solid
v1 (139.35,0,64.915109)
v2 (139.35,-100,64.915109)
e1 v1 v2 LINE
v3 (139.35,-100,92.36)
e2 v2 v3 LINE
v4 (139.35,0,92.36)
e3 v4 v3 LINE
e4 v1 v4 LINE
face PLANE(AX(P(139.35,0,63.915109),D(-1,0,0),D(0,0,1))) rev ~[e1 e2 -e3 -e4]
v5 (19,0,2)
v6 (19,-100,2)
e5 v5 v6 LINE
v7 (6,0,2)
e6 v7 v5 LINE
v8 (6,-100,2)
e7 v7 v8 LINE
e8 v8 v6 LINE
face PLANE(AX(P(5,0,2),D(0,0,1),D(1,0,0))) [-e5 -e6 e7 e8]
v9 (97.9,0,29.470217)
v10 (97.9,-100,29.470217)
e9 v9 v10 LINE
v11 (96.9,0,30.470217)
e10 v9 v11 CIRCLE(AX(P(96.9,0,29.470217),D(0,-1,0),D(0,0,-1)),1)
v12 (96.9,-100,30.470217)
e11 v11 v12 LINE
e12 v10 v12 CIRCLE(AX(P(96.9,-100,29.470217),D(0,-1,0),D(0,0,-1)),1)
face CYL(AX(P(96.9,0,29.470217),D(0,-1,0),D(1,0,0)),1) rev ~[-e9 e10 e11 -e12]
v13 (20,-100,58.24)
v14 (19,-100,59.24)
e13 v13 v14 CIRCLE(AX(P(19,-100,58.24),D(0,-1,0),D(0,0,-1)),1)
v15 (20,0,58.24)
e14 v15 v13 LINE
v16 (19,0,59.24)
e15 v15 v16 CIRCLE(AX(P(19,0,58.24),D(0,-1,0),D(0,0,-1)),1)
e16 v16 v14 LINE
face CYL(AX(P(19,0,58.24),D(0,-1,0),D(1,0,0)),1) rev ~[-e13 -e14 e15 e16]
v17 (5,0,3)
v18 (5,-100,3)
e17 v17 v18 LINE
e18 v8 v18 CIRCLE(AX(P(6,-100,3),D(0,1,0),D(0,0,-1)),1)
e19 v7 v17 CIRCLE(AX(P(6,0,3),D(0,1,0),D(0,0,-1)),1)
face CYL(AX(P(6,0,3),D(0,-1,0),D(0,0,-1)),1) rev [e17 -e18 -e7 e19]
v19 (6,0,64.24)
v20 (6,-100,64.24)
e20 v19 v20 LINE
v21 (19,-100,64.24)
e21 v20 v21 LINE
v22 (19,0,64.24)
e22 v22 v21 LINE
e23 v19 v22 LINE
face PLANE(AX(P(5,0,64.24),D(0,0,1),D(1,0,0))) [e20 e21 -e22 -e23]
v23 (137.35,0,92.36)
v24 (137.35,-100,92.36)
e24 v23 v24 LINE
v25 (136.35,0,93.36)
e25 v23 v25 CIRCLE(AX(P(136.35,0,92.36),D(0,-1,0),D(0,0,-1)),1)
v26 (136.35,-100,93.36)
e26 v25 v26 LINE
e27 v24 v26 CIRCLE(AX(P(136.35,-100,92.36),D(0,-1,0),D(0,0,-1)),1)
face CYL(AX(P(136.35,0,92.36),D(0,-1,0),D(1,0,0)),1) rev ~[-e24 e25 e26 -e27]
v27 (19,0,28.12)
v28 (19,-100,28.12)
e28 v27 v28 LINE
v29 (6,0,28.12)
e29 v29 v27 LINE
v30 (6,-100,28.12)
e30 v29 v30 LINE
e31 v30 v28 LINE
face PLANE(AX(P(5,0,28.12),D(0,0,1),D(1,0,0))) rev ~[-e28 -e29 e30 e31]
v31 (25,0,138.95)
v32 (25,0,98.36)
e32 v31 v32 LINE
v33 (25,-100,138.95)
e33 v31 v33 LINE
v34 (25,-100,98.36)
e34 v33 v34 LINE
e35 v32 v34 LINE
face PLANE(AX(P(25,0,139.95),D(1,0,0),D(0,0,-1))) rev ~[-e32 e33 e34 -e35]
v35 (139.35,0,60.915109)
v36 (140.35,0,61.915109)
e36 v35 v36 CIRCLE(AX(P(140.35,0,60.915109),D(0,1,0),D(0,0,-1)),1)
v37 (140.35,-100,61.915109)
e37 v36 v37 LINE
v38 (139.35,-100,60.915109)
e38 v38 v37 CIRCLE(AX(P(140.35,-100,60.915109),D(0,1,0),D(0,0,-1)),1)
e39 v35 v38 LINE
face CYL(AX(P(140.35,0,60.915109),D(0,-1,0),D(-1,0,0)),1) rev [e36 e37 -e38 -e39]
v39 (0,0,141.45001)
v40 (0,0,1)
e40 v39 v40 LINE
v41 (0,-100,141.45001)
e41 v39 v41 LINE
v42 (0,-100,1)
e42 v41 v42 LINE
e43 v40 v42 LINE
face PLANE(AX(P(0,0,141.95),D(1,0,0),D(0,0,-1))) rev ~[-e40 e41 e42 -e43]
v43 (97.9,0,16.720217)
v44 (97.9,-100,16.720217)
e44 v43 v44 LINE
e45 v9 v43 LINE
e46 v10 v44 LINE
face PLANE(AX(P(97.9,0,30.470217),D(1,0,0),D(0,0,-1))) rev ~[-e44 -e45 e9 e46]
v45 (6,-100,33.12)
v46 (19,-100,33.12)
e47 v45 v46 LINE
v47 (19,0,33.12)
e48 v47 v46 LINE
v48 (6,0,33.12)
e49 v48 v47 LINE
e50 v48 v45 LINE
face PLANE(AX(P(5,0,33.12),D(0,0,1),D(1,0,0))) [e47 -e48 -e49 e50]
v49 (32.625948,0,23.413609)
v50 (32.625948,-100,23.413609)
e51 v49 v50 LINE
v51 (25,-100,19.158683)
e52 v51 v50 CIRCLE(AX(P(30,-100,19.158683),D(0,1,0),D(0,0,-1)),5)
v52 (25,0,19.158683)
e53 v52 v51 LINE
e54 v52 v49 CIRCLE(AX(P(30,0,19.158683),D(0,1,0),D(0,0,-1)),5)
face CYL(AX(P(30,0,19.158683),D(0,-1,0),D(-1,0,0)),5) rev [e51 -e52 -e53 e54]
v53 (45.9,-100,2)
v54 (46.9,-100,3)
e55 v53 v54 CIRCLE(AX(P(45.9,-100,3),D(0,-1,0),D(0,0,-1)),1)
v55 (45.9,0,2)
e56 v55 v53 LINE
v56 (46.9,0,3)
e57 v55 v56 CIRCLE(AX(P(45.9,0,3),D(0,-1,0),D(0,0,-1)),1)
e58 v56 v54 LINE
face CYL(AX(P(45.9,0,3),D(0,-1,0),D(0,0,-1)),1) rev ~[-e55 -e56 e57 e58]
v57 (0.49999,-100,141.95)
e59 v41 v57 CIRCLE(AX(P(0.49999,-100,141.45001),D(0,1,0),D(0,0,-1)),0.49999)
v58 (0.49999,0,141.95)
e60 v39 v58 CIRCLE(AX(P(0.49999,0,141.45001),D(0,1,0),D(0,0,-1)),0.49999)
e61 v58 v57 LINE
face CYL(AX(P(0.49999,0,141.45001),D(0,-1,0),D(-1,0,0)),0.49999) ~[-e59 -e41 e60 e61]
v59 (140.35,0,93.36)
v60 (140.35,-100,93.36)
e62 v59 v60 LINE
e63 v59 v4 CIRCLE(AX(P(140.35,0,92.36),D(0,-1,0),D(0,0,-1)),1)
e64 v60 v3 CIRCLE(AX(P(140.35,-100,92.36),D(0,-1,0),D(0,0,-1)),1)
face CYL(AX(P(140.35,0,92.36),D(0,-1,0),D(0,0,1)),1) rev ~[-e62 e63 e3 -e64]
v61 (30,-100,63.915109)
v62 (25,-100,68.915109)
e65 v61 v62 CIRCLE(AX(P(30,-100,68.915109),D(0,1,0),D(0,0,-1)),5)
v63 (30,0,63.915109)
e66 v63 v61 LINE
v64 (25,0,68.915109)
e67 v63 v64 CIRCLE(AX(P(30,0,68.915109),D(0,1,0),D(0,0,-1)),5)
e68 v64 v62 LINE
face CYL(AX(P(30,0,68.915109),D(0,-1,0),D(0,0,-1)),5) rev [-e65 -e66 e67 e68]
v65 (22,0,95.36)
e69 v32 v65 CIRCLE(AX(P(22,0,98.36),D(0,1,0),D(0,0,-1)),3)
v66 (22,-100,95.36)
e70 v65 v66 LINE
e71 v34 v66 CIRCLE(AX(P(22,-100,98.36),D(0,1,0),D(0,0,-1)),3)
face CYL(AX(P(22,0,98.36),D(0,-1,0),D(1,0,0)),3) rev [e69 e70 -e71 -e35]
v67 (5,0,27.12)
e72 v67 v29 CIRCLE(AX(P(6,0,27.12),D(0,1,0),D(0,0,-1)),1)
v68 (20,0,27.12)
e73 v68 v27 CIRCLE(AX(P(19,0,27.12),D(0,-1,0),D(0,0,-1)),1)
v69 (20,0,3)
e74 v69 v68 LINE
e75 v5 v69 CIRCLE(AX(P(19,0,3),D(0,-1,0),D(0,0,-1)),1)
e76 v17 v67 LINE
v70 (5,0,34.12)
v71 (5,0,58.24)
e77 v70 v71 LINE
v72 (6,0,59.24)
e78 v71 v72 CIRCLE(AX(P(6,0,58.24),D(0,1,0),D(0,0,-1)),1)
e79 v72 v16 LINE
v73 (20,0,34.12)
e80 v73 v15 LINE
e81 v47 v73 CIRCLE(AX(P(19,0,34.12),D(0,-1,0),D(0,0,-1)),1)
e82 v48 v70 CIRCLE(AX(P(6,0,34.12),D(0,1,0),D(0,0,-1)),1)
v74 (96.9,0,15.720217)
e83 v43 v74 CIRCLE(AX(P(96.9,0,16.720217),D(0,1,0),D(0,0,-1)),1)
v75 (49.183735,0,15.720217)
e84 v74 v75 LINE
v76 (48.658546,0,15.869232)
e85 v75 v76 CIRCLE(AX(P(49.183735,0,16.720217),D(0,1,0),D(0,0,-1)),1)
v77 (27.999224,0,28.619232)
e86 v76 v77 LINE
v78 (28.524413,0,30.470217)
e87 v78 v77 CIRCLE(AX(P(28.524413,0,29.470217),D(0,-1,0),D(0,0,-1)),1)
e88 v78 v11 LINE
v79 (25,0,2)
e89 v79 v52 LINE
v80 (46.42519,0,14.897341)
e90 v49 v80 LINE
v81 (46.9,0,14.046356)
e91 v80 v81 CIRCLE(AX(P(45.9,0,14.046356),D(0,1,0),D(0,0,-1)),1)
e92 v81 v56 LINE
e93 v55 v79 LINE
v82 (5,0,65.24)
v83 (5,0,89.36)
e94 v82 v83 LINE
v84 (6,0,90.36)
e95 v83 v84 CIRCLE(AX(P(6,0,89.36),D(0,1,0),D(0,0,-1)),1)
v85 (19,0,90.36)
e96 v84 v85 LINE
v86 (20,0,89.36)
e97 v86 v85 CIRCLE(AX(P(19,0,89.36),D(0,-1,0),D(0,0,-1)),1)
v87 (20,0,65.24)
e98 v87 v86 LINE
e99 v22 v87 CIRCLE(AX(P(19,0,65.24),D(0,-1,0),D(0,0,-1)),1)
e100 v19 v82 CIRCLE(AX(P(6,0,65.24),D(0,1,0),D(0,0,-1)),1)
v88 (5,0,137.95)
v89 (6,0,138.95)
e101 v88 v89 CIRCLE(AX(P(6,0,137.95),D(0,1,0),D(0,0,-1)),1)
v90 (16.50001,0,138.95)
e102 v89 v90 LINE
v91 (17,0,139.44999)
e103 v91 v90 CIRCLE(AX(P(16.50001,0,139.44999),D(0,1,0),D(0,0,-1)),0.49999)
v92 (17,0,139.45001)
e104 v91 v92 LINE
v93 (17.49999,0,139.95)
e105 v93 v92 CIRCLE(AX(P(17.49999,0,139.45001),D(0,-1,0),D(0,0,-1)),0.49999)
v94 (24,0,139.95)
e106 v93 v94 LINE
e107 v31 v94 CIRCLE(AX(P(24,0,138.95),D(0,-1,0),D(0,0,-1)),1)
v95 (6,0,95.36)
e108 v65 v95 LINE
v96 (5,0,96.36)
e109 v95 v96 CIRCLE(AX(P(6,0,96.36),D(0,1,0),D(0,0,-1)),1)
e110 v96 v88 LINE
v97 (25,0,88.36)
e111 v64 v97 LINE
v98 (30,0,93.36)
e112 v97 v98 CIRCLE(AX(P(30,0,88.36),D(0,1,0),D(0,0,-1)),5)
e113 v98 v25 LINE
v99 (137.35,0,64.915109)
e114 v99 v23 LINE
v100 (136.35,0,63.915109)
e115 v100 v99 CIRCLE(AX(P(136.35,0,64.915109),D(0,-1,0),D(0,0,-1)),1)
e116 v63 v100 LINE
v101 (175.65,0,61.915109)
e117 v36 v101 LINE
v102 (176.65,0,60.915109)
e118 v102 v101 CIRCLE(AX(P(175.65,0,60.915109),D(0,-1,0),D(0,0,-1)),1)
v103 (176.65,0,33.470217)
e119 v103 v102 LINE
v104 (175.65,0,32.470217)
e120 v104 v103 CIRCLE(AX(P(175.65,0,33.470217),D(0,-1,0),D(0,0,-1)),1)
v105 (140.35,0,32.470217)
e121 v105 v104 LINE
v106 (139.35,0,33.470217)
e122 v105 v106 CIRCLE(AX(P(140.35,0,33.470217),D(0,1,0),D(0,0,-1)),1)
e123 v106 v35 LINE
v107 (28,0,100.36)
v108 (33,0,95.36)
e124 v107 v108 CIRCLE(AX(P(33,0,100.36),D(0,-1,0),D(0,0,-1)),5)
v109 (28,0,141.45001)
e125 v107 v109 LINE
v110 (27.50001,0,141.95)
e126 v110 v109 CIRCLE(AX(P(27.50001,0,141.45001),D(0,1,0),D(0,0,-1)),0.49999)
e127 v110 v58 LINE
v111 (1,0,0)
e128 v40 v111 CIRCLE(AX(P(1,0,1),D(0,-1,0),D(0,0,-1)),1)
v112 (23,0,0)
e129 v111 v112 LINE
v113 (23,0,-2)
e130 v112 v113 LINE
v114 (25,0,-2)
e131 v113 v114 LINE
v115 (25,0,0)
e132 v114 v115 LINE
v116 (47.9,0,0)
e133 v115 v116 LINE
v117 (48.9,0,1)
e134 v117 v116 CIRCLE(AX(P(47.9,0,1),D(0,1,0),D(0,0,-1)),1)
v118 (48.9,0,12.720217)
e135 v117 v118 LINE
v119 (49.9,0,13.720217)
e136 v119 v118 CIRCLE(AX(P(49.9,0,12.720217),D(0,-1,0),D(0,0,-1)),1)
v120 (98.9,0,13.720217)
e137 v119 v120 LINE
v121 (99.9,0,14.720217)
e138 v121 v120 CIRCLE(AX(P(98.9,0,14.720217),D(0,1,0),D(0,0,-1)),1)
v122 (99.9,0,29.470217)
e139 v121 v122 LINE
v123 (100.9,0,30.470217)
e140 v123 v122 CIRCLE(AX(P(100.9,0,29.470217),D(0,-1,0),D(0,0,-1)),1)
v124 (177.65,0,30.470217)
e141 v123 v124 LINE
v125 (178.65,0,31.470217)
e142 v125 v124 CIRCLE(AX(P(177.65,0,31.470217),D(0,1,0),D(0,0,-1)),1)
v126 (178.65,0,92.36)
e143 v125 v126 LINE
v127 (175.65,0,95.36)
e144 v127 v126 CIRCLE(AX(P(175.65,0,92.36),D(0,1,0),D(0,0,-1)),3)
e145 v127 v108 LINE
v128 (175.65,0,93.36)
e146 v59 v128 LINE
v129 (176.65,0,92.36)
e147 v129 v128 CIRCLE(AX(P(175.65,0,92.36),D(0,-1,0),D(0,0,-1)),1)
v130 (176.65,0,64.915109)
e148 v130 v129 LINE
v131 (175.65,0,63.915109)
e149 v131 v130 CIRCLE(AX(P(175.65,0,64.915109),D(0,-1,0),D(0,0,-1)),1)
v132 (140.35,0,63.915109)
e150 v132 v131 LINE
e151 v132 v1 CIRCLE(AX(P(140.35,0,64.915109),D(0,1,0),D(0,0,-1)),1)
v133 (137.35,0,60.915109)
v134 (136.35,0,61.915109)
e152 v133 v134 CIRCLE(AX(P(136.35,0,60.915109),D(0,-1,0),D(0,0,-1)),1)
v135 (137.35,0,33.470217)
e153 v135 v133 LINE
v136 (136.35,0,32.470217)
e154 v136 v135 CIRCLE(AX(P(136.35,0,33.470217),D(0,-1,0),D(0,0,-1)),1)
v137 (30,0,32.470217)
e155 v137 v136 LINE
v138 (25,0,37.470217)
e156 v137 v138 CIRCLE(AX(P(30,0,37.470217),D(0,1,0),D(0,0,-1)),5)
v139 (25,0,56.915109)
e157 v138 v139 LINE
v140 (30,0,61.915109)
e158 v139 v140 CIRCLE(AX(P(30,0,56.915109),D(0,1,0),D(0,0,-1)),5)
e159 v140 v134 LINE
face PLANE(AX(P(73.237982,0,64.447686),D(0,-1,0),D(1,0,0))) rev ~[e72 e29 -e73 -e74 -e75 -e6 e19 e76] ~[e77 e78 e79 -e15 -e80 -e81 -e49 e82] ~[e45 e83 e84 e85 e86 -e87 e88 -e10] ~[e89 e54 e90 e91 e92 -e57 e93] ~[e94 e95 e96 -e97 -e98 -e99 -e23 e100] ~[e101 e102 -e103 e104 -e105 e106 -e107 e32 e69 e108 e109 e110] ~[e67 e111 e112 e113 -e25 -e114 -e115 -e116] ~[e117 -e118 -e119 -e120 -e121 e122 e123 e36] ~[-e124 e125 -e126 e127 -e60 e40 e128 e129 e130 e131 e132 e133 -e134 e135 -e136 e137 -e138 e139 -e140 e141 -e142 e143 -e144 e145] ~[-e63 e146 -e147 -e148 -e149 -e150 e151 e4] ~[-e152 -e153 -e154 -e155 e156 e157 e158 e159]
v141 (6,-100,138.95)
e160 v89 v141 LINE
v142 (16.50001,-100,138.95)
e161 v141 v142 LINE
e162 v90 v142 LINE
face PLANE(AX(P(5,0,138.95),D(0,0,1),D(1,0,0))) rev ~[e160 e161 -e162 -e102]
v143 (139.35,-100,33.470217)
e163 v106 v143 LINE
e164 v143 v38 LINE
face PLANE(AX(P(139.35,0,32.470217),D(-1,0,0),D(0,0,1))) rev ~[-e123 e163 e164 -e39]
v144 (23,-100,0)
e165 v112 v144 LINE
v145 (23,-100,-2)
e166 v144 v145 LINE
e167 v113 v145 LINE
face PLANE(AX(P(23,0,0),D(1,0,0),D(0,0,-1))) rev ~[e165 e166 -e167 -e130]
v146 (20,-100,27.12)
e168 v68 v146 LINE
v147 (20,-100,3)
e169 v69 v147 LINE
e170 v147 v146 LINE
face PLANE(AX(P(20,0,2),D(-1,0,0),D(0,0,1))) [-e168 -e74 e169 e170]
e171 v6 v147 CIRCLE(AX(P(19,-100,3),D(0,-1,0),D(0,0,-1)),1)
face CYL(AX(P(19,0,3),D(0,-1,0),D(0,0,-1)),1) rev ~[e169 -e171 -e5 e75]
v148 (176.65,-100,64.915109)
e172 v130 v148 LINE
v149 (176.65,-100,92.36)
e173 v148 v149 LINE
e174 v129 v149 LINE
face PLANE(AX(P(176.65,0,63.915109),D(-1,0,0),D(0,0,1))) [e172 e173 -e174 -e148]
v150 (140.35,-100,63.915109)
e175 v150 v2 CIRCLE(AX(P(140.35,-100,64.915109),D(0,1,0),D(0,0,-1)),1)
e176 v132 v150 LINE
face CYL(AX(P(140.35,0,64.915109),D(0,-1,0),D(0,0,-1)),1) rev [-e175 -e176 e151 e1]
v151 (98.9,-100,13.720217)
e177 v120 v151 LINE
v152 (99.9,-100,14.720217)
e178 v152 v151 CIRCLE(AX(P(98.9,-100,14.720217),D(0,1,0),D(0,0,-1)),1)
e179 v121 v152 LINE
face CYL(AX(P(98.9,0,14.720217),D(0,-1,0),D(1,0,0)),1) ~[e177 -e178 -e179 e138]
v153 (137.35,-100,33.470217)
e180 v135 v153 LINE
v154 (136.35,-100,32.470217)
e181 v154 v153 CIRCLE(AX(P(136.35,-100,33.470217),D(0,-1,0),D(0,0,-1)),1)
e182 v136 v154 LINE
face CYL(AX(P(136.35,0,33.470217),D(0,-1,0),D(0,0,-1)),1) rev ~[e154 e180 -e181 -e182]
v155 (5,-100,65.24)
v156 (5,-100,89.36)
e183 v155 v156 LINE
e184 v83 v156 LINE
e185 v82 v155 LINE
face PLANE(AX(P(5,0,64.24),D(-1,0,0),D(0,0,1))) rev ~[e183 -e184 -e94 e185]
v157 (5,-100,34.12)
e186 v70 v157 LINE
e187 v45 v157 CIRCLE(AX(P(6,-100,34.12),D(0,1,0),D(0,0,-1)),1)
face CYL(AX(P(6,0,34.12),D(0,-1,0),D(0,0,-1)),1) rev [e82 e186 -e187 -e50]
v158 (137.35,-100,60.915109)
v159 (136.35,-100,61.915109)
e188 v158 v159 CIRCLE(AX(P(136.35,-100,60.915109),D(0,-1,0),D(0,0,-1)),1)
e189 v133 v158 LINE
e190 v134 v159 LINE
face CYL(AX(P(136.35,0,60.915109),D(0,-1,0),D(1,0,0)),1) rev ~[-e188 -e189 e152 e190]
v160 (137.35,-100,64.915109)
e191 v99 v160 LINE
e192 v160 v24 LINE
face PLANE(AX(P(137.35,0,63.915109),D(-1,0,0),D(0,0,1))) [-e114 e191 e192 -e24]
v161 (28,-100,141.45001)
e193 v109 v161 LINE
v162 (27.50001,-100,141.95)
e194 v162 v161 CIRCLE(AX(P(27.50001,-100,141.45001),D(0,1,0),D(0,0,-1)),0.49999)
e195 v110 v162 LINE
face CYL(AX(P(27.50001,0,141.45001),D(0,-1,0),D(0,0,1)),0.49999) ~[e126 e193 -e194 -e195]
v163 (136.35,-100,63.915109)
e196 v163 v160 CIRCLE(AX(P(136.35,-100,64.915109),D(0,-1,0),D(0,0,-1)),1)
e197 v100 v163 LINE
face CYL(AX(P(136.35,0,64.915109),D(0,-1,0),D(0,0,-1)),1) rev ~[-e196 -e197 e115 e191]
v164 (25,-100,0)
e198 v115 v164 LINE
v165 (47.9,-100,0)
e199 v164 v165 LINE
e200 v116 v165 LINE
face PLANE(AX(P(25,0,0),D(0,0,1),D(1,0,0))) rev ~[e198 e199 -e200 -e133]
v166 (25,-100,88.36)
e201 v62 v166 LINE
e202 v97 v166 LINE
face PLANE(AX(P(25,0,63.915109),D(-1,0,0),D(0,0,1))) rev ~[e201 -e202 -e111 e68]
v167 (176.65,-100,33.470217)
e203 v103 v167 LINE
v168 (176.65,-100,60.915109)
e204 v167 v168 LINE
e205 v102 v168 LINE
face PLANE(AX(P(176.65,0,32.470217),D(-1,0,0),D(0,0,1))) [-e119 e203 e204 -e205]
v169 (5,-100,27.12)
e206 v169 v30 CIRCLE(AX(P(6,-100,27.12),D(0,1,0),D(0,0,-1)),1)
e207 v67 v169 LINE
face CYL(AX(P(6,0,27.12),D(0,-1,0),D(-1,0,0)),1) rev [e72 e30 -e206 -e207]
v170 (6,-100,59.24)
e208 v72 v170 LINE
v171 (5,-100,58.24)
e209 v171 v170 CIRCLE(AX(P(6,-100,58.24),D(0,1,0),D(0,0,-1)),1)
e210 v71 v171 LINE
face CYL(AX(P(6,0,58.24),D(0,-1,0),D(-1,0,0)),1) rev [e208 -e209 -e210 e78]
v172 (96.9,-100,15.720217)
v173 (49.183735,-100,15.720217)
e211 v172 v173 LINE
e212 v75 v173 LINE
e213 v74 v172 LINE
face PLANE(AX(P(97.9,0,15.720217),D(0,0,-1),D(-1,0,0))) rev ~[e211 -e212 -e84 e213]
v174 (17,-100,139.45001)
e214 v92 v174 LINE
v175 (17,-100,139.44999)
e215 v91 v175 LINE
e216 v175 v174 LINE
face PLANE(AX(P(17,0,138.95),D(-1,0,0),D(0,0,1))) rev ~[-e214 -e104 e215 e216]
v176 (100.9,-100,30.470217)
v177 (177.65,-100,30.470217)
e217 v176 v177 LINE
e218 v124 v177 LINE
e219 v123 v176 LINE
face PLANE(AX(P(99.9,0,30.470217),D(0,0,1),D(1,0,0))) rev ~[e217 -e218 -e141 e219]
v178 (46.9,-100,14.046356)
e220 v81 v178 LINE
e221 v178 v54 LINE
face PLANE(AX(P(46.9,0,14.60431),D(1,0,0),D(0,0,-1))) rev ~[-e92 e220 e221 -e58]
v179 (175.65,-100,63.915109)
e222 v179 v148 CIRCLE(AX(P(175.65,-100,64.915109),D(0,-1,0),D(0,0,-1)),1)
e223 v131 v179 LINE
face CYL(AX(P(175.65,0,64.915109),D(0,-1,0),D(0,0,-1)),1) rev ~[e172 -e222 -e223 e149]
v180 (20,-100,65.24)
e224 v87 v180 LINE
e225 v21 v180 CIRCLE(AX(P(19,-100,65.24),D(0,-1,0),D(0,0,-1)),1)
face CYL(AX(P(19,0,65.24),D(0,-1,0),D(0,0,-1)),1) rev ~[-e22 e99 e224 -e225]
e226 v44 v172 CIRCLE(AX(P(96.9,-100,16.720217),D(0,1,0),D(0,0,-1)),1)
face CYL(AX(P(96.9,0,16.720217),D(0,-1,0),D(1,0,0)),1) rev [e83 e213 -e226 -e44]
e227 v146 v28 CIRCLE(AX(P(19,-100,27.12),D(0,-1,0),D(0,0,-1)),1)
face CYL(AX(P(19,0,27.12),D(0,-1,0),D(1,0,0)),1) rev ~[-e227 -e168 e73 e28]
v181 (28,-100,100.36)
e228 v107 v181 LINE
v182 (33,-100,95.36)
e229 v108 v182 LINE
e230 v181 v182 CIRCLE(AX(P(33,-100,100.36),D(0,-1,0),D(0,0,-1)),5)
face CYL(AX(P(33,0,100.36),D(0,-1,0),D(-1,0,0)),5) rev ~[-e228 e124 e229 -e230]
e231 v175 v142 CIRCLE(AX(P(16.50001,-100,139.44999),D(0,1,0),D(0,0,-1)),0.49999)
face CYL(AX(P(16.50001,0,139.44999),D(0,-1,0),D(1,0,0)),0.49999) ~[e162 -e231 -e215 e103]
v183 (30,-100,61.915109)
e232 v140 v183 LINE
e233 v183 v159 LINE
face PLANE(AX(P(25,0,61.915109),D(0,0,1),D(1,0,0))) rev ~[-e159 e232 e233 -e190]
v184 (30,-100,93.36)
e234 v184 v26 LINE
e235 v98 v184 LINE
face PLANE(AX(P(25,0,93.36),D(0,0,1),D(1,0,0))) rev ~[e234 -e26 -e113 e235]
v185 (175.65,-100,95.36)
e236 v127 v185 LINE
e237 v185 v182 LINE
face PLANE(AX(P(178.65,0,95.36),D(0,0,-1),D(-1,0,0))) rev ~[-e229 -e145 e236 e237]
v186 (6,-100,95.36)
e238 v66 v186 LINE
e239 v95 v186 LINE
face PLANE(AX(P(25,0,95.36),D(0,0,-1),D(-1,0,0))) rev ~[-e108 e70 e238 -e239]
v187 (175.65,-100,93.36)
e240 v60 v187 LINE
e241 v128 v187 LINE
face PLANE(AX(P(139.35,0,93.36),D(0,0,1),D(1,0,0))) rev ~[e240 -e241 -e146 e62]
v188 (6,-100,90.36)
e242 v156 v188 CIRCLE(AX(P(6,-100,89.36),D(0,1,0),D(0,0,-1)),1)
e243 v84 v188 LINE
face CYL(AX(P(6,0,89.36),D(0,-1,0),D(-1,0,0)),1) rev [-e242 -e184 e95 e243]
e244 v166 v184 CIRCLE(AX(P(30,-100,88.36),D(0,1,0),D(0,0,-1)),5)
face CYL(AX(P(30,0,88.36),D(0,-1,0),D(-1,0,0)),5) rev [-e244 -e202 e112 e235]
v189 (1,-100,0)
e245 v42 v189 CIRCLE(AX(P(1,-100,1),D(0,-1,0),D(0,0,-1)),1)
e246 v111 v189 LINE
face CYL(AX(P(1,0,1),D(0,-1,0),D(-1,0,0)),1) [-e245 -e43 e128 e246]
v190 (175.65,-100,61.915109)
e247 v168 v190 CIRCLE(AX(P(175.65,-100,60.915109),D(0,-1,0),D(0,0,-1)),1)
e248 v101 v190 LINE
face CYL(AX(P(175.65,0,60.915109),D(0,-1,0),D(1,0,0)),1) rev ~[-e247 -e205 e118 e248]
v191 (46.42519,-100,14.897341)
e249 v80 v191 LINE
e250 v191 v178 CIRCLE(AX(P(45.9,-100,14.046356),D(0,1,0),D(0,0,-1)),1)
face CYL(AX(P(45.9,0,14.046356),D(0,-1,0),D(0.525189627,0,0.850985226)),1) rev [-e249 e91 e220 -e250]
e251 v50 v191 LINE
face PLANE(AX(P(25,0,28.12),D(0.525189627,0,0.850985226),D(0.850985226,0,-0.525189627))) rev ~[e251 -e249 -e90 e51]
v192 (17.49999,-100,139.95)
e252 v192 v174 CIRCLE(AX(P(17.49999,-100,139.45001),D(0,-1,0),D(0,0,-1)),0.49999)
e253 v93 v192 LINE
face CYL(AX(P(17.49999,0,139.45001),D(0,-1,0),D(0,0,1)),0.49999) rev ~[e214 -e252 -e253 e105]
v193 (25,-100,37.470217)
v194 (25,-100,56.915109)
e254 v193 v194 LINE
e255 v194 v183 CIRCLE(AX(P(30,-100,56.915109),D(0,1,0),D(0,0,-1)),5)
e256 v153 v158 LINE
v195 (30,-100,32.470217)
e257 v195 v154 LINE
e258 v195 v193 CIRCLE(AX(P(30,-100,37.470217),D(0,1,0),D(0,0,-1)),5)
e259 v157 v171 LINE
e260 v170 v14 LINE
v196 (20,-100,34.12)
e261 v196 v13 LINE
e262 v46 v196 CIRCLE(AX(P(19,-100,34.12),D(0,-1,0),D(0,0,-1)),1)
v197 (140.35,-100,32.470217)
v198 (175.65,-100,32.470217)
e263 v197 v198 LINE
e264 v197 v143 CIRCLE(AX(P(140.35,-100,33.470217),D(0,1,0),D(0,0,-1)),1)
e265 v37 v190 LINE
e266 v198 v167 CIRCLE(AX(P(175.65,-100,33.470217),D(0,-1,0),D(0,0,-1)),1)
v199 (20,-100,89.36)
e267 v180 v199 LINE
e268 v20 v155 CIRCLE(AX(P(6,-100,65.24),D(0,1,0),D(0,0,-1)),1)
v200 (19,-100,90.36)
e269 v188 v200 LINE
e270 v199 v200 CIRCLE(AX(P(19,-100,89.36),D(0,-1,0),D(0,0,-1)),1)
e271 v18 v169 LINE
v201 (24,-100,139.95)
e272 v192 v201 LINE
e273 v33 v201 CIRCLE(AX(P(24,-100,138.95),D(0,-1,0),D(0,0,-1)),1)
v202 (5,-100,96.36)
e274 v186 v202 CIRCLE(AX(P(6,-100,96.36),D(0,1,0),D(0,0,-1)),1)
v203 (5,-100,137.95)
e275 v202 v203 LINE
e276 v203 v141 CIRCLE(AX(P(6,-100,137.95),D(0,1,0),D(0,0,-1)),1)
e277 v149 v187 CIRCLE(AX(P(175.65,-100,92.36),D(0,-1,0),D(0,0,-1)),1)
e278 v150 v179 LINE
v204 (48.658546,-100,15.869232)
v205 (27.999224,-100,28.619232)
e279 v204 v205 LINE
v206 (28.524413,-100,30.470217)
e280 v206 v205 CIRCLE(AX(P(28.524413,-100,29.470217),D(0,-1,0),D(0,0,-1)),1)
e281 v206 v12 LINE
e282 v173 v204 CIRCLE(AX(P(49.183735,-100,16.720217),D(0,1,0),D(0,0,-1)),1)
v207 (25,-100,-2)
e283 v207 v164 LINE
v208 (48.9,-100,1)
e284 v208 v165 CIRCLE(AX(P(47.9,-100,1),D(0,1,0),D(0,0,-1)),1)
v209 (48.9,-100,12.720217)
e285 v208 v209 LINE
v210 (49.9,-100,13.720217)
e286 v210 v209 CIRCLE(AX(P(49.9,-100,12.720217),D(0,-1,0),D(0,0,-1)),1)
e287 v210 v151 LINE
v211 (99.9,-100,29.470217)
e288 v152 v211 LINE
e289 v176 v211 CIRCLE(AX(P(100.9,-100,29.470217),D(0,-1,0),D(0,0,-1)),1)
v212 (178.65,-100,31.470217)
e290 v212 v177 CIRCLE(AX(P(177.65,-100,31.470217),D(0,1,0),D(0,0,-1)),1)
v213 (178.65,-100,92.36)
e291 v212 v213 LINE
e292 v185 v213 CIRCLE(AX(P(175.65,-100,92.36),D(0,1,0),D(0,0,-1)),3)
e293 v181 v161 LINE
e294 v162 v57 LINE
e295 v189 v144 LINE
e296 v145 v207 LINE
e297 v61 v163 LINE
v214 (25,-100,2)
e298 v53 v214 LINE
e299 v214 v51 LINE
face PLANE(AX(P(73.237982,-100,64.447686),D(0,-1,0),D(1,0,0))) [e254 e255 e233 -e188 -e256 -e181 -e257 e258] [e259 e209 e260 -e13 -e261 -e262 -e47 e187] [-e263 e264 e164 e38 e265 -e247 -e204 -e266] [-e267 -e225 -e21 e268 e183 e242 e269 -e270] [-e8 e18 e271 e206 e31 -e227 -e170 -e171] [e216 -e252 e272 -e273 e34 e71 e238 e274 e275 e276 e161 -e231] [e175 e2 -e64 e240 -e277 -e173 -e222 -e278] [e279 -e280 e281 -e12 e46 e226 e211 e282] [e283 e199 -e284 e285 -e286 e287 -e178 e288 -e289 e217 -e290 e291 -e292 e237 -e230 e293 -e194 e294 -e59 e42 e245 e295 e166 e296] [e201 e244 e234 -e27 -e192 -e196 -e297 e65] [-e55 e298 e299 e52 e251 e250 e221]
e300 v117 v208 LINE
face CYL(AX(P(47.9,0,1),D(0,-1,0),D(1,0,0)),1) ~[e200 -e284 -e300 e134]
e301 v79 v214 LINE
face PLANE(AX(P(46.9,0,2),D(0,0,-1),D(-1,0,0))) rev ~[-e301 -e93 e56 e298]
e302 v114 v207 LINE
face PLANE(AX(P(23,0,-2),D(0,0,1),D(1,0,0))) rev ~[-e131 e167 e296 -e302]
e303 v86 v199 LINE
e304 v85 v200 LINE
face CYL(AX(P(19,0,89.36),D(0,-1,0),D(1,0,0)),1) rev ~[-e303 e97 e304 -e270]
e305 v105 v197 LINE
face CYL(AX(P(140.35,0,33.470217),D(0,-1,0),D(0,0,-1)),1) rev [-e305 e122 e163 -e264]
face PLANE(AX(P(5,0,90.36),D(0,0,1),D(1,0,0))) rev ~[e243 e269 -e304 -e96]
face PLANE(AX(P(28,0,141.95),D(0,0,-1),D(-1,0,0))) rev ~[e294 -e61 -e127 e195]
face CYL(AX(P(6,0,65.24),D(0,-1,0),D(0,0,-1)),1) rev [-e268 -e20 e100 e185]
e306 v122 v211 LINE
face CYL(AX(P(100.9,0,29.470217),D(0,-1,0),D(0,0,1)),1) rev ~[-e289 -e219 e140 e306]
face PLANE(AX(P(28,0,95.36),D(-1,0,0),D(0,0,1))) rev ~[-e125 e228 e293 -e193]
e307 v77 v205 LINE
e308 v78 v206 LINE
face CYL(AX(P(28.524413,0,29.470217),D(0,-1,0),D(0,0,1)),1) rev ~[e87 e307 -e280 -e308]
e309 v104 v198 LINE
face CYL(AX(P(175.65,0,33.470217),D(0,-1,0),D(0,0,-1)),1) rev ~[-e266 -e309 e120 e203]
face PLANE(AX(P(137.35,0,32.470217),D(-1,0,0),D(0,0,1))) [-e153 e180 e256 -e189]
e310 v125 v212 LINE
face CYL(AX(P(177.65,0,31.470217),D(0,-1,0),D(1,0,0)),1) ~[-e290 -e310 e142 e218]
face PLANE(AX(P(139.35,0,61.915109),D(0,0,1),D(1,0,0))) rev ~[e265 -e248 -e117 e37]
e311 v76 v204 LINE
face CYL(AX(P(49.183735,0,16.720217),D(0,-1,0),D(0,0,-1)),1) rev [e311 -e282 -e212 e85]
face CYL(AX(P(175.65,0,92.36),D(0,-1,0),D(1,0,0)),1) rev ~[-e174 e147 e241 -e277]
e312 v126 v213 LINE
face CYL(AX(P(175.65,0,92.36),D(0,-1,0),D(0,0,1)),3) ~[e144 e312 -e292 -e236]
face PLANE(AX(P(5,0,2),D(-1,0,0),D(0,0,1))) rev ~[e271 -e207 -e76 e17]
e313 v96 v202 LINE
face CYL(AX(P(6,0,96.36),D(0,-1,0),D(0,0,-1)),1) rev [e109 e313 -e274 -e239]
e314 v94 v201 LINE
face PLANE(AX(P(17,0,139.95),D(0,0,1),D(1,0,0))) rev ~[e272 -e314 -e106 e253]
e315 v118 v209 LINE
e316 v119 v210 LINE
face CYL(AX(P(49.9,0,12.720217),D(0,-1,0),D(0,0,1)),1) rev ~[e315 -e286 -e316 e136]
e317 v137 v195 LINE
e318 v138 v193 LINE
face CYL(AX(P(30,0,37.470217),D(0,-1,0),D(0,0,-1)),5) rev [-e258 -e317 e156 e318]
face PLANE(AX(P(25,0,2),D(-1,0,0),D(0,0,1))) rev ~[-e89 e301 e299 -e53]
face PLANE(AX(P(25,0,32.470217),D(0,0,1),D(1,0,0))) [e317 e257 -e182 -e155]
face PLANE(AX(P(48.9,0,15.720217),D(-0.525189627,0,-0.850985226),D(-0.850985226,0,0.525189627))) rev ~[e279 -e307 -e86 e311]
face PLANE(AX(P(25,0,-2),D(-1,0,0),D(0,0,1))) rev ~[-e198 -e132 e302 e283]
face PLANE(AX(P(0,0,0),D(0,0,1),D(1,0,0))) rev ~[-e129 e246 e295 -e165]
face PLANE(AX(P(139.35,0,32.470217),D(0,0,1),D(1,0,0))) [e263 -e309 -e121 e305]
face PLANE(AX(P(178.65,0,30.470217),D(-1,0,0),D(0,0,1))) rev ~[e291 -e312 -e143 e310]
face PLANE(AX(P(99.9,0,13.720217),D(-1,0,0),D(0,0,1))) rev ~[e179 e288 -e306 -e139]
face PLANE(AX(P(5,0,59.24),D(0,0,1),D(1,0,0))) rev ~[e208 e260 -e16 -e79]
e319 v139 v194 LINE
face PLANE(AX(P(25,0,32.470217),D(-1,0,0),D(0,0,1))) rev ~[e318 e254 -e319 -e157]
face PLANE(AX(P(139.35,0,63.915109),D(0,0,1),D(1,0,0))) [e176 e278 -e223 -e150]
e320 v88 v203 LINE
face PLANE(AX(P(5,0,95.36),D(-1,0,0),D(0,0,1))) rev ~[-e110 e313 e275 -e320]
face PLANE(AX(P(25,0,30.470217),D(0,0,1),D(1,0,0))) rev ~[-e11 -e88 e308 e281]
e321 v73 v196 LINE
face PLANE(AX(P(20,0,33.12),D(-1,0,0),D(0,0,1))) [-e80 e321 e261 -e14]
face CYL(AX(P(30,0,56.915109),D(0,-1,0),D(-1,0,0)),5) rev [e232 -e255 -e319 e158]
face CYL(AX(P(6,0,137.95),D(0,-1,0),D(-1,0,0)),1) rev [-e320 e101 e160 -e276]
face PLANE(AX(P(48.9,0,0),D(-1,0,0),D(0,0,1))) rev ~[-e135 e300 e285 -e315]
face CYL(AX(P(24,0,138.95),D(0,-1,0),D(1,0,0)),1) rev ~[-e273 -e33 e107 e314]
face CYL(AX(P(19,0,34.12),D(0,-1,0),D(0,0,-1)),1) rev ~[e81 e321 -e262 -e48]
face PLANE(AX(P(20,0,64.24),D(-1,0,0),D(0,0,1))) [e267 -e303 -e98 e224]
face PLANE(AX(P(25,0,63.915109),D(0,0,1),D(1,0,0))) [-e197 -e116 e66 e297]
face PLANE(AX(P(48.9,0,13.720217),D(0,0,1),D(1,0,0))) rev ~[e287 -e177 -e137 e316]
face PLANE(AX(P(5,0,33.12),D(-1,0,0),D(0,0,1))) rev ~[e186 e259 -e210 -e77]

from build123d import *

# Parameters (mm, degrees)
F0_W     = 15
F0_H     = 26.12
F0_W_2   = 112.35
F0_H_2   = 29.4448914682
F0_W_3   = 37.3
F1_DEPTH = 100
F2_R     = 5
F3_R     = 1
F4_R     = 0.49999
F5_R     = 3


# Not quite as in the source:
# - two fillets or chamfers of one size are made in one step
# - a fillet or chamfer is up to 0.001 mm smaller than in the source, because OpenCascade refuses the exact size
# - a feature names something its author has since deleted; it is built from what else it names


with BuildPart() as f1:
    # F0 (on Front) → F1 (new body)
    with BuildSketch(Plane.XZ):
        Polygon((0, 141.95), (0, 0), (23, 0), (23, -2), (25, -2), (25, 0), (48.9, 0), (48.9, 13.7202170637), (99.9, 13.7202170637), (99.9, 30.4702170637), (178.65, 30.4702170637), (178.65, 95.36), (28, 95.36), (28, 141.95), align=None)
        with Locations((12.5, 15.06)):
            Rectangle(F0_W, F0_H, mode=Mode.SUBTRACT)
        Polygon((25, 2), (25, 28.12), (46.9, 14.6043096234), (46.9, 2), align=None, mode=Mode.SUBTRACT)
        Polygon((97.9, 15.7202170637), (48.9, 15.7202170637), (25, 30.4702170637), (97.9, 30.4702170637), align=None, mode=Mode.SUBTRACT)
        with Locations((12.5, 46.18)):
            Rectangle(F0_W, F0_H, mode=Mode.SUBTRACT)
        with Locations((81.175, 47.1926627978)):
            Rectangle(F0_W_2, F0_H_2, mode=Mode.SUBTRACT)
        with Locations((158, 47.1926627978)):
            Rectangle(F0_W_3, F0_H_2, mode=Mode.SUBTRACT)
        with Locations((12.5, 77.3)):
            Rectangle(F0_W, F0_H, mode=Mode.SUBTRACT)
        with Locations((81.175, 78.6375542659)):
            Rectangle(F0_W_2, F0_H_2, mode=Mode.SUBTRACT)
        Polygon((25, 95.36), (5, 95.36), (5, 138.95), (17, 138.95), (17, 139.95), (25, 139.95), align=None, mode=Mode.SUBTRACT)
        with Locations((158, 78.6375542659)):
            Rectangle(F0_W_3, F0_H_2, mode=Mode.SUBTRACT)
    extrude(amount=F1_DEPTH)

    # F2
    f2_edges = [f1.edges().sort_by_distance(p)[0] for p in [
        (28, -50, 95.36),
        (25, -50, 28.12),
        (25, -50, 32.470217),
        (25, -50, 61.915109),
        (25, -50, 93.36),
        (25, -50, 63.915109),
    ]]
    fillet(f2_edges, radius=F2_R)

    # F3
    f3_edges = [f1.edges().sort_by_distance(p)[0] for p in [
        (5, -50, 64.24),
        (5, -50, 33.12),
        (5, -50, 2),
        (5, -50, 90.36),
        (5, -50, 59.24),
        (5, -50, 28.12),
        (20, -50, 28.12),
        (20, -50, 59.24),
        (20, -50, 90.36),
        (20, -50, 64.24),
        (20, -50, 33.12),
        (20, -50, 2),
        (46.9, -50, 2),
        (46.9, -50, 14.60431),
        (25, -50, 30.470217),
        (97.9, -50, 15.720217),
        (97.9, -50, 30.470217),
        (137.35, -50, 61.915109),
        (137.35, -50, 93.36),
        (137.35, -50, 63.915109),
        (137.35, -50, 32.470217),
        (176.65, -50, 32.470217),
        (176.65, -50, 63.915109),
        (139.35, -50, 63.915109),
        (139.35, -50, 61.915109),
        (139.35, -50, 93.36),
        (176.65, -50, 93.36),
        (176.65, -50, 61.915109),
        (139.35, -50, 32.470217),
        (99.9, -50, 30.470217),
        (48.9, -50, 13.720217),
        (48.9, -50, 0),
        (0, -50, 0),
        (48.9, -50, 15.720217),
        (99.9, -50, 13.720217),
        (178.65, -50, 30.470217),
        (25, -50, 139.95),
        (5, -50, 95.36),
        (5, -50, 138.95),
    ]]
    fillet(f3_edges, radius=F3_R)

    # F4 (radius 0.5 in the source; OpenCascade refuses exactly that, so slightly less here)
    f4_edges = [f1.edges().sort_by_distance(p)[0] for p in [
        (0, -50, 141.95),
        (28, -50, 141.95),
        (17, -50, 139.95),
        (17, -50, 138.95),
    ]]
    fillet(f4_edges, radius=F4_R)

    # F5
    f5_edges = [f1.edges().sort_by_distance(p)[0] for p in [
        (178.65, -50, 95.36),
        (25, -50, 95.36),
    ]]
    fillet(f5_edges, radius=F5_R)


solid = f1.part
